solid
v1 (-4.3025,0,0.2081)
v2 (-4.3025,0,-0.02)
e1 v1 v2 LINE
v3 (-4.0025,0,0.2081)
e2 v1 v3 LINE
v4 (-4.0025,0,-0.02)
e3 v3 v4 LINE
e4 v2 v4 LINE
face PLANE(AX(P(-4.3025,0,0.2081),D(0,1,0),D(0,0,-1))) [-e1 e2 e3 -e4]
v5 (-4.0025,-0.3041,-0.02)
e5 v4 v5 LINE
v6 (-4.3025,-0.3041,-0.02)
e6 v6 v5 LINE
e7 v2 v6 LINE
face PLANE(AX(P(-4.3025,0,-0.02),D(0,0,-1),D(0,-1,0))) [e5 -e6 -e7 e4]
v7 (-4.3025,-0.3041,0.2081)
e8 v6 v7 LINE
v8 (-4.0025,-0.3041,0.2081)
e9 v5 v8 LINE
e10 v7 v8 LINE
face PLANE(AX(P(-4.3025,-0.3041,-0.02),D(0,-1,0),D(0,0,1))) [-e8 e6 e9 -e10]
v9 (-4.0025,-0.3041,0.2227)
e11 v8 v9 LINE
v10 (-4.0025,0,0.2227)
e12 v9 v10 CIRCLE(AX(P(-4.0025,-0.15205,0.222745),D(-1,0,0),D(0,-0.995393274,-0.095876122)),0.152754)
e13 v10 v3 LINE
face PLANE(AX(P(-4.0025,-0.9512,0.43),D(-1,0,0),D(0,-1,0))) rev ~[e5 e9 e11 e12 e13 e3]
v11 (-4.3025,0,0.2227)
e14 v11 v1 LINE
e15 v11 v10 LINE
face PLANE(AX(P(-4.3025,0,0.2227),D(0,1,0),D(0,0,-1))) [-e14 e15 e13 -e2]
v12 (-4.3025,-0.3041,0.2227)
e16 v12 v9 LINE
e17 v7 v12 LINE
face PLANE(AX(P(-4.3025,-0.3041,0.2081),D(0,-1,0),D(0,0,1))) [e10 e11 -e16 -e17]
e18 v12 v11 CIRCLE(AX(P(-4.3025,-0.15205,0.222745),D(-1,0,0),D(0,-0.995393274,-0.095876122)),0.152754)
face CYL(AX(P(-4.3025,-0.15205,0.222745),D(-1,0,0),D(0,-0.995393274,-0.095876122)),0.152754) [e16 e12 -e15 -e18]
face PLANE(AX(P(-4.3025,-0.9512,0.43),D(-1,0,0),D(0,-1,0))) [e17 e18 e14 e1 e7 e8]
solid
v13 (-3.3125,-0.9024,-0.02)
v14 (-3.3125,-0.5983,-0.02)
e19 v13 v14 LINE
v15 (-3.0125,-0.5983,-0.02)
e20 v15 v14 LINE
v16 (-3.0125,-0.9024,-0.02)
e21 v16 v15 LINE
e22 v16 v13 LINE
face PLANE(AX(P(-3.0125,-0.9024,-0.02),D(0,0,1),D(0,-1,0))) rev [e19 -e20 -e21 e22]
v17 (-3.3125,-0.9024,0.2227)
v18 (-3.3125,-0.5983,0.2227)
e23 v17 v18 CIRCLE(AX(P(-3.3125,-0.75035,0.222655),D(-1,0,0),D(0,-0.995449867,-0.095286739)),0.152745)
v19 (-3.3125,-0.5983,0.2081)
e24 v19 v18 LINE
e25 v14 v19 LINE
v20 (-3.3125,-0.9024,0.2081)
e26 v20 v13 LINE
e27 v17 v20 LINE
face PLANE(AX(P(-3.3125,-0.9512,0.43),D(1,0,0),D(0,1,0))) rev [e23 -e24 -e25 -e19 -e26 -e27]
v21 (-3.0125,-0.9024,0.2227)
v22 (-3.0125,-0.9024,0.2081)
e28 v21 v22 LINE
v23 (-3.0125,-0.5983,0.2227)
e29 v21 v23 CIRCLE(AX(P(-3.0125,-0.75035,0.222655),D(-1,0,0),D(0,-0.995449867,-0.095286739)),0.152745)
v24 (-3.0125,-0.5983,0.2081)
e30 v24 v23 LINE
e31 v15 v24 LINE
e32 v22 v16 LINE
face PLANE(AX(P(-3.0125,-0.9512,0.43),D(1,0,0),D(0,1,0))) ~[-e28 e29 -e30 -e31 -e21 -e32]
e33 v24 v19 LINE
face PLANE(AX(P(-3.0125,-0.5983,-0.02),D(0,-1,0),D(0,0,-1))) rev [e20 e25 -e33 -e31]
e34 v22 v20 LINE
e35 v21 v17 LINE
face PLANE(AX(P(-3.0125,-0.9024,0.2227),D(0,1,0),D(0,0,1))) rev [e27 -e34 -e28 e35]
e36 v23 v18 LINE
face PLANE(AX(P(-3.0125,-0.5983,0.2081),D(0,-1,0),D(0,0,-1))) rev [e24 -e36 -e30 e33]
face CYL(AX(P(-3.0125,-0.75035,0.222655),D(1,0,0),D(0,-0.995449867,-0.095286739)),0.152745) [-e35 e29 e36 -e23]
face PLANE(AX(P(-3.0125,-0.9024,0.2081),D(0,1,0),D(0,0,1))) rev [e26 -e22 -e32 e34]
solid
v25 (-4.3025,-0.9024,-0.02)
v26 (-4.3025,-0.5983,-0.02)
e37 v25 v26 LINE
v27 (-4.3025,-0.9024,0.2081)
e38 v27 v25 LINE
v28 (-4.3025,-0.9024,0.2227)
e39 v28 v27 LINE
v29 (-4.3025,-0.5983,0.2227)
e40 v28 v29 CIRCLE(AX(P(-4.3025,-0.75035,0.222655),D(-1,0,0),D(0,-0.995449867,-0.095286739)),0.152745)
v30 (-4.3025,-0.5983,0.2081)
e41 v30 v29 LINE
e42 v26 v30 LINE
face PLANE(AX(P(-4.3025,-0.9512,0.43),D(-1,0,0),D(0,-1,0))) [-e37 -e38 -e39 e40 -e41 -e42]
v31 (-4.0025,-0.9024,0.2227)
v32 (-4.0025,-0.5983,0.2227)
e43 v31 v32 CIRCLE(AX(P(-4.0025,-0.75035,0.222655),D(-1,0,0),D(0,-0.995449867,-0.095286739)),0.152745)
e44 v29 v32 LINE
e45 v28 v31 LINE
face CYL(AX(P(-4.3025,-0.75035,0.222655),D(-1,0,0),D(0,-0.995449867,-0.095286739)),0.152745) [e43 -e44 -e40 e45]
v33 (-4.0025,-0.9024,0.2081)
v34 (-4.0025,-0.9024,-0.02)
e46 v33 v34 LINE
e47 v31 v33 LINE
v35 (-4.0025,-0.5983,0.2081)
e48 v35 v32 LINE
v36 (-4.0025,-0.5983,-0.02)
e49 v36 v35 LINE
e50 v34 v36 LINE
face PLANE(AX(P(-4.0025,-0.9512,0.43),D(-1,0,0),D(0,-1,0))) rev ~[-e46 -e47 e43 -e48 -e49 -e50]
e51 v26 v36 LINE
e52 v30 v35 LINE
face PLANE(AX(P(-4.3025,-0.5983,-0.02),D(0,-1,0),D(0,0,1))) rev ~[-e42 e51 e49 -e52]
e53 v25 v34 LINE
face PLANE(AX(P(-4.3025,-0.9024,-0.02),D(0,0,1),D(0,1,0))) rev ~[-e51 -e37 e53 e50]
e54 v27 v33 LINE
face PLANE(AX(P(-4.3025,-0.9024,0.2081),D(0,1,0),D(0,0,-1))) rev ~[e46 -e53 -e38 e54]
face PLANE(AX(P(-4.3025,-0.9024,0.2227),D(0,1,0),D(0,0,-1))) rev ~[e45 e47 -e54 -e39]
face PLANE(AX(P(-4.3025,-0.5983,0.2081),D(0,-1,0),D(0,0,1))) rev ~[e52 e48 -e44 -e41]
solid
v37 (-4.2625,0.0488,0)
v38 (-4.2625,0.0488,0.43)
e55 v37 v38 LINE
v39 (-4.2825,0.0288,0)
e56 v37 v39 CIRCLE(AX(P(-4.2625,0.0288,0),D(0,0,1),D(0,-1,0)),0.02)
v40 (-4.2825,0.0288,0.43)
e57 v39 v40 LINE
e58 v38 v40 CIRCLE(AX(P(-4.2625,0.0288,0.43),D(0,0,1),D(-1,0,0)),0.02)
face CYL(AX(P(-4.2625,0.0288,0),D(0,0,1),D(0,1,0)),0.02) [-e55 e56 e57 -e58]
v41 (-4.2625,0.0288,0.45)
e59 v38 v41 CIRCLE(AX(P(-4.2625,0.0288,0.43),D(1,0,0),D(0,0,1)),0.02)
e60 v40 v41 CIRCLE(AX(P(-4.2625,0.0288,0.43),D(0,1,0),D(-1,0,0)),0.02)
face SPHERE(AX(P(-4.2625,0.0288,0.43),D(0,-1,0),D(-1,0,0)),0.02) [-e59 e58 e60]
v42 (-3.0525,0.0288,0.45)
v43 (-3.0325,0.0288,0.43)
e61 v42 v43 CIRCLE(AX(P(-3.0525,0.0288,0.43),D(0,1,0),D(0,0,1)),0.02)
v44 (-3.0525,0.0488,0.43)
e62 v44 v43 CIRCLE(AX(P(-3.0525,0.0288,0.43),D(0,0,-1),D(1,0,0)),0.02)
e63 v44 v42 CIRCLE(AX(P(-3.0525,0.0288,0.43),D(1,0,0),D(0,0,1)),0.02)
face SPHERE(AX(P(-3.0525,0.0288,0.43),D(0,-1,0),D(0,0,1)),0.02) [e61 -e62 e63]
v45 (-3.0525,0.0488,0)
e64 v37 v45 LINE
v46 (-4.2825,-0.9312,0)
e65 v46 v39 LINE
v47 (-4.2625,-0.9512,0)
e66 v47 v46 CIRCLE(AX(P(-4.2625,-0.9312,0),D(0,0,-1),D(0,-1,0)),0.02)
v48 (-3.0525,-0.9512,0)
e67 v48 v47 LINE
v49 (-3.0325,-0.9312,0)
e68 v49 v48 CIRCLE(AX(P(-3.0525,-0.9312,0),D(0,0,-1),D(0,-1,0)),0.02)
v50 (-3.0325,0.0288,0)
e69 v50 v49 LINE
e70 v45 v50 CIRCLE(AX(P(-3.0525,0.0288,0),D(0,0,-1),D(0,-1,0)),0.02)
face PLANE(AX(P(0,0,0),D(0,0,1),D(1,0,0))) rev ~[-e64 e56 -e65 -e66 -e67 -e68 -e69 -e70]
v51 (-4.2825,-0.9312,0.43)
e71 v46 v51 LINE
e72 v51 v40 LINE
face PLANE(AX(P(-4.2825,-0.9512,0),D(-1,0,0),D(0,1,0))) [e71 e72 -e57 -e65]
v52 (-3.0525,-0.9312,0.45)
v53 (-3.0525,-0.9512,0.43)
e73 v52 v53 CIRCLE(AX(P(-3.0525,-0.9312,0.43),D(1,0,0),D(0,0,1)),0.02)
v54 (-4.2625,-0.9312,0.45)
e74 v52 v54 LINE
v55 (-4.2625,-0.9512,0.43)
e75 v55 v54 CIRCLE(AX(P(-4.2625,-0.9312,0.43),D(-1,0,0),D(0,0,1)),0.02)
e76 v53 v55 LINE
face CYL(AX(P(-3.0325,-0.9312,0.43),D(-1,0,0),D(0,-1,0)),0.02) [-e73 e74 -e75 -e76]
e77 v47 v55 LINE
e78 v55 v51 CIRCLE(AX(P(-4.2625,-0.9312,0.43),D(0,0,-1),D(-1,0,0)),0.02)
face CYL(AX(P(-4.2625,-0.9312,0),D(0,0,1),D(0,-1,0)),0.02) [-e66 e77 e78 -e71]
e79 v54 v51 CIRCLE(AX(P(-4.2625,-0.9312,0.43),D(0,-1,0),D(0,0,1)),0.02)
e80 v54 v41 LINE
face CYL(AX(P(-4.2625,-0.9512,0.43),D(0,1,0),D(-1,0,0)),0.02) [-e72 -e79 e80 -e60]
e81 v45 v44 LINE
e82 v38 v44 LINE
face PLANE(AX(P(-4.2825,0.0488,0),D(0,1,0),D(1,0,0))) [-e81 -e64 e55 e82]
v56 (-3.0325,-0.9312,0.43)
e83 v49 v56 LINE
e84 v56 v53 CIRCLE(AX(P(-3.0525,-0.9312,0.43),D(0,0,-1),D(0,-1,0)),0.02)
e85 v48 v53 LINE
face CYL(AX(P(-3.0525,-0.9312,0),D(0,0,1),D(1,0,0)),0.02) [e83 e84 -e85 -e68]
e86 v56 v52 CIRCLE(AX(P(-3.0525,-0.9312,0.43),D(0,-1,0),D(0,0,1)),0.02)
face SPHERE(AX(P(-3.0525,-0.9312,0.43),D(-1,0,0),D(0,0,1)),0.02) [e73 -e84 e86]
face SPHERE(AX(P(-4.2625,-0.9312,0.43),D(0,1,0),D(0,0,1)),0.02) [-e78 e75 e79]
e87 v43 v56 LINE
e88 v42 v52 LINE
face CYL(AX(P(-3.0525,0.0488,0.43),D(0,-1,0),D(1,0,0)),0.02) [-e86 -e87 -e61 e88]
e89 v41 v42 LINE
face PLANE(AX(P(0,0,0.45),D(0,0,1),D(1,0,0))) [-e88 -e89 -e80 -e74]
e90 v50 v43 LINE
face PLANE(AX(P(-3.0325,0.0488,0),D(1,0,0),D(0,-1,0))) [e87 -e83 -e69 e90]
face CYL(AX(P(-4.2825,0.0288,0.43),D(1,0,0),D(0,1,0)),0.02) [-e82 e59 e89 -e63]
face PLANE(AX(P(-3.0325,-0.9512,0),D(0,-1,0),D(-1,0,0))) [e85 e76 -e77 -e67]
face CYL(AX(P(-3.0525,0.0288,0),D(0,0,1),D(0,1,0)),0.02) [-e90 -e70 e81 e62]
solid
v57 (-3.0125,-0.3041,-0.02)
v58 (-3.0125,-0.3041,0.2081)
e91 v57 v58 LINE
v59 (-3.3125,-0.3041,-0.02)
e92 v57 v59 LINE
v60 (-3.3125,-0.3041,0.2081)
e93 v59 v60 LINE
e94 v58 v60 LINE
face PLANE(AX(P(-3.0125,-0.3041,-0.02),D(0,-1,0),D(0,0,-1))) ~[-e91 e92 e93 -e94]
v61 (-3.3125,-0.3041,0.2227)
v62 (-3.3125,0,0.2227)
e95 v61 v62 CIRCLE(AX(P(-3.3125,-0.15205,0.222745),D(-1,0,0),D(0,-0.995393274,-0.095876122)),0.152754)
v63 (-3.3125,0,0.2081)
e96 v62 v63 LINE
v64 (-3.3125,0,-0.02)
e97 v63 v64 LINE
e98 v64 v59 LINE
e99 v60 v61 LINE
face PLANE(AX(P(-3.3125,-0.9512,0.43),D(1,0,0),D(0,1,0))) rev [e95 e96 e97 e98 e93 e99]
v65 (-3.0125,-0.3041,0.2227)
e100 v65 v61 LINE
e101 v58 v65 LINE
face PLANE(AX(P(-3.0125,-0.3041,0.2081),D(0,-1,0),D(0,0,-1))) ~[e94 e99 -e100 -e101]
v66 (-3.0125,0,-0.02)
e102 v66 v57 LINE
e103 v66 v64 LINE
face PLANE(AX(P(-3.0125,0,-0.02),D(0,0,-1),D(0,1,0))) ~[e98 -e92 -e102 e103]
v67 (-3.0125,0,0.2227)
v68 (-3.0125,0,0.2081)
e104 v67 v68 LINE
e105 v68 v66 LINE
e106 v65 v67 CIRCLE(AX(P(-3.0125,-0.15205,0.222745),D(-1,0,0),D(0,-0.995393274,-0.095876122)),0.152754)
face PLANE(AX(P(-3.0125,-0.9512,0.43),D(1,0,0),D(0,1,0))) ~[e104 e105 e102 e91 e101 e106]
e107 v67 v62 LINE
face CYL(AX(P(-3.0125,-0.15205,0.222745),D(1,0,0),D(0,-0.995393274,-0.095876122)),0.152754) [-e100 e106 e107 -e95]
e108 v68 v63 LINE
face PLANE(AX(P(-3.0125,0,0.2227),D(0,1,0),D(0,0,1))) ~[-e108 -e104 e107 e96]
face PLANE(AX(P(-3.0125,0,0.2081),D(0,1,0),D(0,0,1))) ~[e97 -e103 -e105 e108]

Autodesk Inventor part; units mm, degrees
ref_plane "YZ Plane" through (0, 0, 0) normal (1, 0, 0) x (0, 1, 0)
ref_plane "XZ Plane" through (0, 0, 0) normal (0, 1, 0) x (-1, 0, 0)
sketch "Boceto1" plane through (0, 0, 0) normal (0, 0, 1) x (1, 0, 0)
  line L0 (-4.2825, 0.0488) -> (-3.0325, 0.0488)
  line L1 (-3.0325, 0.0488) -> (-3.0325, -0.9512)
  line L2 (-3.0325, -0.9512) -> (-4.2825, -0.9512)
  line L3 (-4.2825, -0.9512) -> (-4.2825, 0.0488)
  point P0 (0, 0)
  dimension "d0" = 1.25
  dimension "d1" = 1
extrude "Extrusión1" add sketch "Boceto1" along normal blind 0.45
ref_plane "Plano de trabajo1" through (-4.2825, -0.9512, 0.45) normal (-1, 0, 0) x (0, -1, 0)
sketch "Boceto2" plane through (-4.2825, -0.9512, 0.45) normal (-1, 0, 0) x (0, -1, 0)
  line L0 (-0.9512, -0.45) -> (-0.6471, -0.45)
  line L1 (-0.6471, -0.45) -> (-0.6471, -0.2073)
  line L2 (-0.9512, -0.2073) -> (-0.9512, -0.45)
  arc A0 (-0.6471, -0.2219) -> (-0.9512, -0.2219) centre (-0.7992, -0.2073) ccw
  line L3 (0, -0.45) -> (-1, -0.45) projected
  line L4 (-0.0488, -0.45) -> (-0.3529, -0.45)
  line L5 (-0.3529, -0.45) -> (-0.3529, -0.2073)
  line L6 (-0.0488, -0.2073) -> (-0.0488, -0.45)
  arc A1 (-0.0488, -0.2219) -> (-0.3529, -0.2219) centre (-0.2008, -0.2073) ccw
extrude "Extrusión2" add sketch "Boceto2" against normal blind 0.3 separate body
move or copy body "Desplazar1" bodies to move or copy 2 copy no translate (-0.02, 0, -0.02)
ref_plane "Plano de trabajo3" through (-3.6575, 0.0488, 0.45) normal (1, 0, 0) x (0, 1, 0)
ref_plane "Plano de trabajo2" through (-3.0325, 0.0488, 0.45) normal (1, 0, 0) x (0, 1, 0)
mirror "Simetría1" about plane through (-3.6575, 0.0488, 0.45) normal (1, 0, 0) bodies 2
fillet "Empalme1" radius 0.02 8 edges at (-4.2825, -0.4512, 0.45) (-3.6575, -0.9512, 0.45) (-3.0325, -0.4512, 0.45) (-3.0325, -0.9512, 0.225) (-4.2825, -0.9512, 0.225) (-4.2825, 0.0488, 0.225) (-3.6575, 0.0488, 0.45) (-3.0325, 0.0488, 0.225)
properties part number "4pin_smd"
